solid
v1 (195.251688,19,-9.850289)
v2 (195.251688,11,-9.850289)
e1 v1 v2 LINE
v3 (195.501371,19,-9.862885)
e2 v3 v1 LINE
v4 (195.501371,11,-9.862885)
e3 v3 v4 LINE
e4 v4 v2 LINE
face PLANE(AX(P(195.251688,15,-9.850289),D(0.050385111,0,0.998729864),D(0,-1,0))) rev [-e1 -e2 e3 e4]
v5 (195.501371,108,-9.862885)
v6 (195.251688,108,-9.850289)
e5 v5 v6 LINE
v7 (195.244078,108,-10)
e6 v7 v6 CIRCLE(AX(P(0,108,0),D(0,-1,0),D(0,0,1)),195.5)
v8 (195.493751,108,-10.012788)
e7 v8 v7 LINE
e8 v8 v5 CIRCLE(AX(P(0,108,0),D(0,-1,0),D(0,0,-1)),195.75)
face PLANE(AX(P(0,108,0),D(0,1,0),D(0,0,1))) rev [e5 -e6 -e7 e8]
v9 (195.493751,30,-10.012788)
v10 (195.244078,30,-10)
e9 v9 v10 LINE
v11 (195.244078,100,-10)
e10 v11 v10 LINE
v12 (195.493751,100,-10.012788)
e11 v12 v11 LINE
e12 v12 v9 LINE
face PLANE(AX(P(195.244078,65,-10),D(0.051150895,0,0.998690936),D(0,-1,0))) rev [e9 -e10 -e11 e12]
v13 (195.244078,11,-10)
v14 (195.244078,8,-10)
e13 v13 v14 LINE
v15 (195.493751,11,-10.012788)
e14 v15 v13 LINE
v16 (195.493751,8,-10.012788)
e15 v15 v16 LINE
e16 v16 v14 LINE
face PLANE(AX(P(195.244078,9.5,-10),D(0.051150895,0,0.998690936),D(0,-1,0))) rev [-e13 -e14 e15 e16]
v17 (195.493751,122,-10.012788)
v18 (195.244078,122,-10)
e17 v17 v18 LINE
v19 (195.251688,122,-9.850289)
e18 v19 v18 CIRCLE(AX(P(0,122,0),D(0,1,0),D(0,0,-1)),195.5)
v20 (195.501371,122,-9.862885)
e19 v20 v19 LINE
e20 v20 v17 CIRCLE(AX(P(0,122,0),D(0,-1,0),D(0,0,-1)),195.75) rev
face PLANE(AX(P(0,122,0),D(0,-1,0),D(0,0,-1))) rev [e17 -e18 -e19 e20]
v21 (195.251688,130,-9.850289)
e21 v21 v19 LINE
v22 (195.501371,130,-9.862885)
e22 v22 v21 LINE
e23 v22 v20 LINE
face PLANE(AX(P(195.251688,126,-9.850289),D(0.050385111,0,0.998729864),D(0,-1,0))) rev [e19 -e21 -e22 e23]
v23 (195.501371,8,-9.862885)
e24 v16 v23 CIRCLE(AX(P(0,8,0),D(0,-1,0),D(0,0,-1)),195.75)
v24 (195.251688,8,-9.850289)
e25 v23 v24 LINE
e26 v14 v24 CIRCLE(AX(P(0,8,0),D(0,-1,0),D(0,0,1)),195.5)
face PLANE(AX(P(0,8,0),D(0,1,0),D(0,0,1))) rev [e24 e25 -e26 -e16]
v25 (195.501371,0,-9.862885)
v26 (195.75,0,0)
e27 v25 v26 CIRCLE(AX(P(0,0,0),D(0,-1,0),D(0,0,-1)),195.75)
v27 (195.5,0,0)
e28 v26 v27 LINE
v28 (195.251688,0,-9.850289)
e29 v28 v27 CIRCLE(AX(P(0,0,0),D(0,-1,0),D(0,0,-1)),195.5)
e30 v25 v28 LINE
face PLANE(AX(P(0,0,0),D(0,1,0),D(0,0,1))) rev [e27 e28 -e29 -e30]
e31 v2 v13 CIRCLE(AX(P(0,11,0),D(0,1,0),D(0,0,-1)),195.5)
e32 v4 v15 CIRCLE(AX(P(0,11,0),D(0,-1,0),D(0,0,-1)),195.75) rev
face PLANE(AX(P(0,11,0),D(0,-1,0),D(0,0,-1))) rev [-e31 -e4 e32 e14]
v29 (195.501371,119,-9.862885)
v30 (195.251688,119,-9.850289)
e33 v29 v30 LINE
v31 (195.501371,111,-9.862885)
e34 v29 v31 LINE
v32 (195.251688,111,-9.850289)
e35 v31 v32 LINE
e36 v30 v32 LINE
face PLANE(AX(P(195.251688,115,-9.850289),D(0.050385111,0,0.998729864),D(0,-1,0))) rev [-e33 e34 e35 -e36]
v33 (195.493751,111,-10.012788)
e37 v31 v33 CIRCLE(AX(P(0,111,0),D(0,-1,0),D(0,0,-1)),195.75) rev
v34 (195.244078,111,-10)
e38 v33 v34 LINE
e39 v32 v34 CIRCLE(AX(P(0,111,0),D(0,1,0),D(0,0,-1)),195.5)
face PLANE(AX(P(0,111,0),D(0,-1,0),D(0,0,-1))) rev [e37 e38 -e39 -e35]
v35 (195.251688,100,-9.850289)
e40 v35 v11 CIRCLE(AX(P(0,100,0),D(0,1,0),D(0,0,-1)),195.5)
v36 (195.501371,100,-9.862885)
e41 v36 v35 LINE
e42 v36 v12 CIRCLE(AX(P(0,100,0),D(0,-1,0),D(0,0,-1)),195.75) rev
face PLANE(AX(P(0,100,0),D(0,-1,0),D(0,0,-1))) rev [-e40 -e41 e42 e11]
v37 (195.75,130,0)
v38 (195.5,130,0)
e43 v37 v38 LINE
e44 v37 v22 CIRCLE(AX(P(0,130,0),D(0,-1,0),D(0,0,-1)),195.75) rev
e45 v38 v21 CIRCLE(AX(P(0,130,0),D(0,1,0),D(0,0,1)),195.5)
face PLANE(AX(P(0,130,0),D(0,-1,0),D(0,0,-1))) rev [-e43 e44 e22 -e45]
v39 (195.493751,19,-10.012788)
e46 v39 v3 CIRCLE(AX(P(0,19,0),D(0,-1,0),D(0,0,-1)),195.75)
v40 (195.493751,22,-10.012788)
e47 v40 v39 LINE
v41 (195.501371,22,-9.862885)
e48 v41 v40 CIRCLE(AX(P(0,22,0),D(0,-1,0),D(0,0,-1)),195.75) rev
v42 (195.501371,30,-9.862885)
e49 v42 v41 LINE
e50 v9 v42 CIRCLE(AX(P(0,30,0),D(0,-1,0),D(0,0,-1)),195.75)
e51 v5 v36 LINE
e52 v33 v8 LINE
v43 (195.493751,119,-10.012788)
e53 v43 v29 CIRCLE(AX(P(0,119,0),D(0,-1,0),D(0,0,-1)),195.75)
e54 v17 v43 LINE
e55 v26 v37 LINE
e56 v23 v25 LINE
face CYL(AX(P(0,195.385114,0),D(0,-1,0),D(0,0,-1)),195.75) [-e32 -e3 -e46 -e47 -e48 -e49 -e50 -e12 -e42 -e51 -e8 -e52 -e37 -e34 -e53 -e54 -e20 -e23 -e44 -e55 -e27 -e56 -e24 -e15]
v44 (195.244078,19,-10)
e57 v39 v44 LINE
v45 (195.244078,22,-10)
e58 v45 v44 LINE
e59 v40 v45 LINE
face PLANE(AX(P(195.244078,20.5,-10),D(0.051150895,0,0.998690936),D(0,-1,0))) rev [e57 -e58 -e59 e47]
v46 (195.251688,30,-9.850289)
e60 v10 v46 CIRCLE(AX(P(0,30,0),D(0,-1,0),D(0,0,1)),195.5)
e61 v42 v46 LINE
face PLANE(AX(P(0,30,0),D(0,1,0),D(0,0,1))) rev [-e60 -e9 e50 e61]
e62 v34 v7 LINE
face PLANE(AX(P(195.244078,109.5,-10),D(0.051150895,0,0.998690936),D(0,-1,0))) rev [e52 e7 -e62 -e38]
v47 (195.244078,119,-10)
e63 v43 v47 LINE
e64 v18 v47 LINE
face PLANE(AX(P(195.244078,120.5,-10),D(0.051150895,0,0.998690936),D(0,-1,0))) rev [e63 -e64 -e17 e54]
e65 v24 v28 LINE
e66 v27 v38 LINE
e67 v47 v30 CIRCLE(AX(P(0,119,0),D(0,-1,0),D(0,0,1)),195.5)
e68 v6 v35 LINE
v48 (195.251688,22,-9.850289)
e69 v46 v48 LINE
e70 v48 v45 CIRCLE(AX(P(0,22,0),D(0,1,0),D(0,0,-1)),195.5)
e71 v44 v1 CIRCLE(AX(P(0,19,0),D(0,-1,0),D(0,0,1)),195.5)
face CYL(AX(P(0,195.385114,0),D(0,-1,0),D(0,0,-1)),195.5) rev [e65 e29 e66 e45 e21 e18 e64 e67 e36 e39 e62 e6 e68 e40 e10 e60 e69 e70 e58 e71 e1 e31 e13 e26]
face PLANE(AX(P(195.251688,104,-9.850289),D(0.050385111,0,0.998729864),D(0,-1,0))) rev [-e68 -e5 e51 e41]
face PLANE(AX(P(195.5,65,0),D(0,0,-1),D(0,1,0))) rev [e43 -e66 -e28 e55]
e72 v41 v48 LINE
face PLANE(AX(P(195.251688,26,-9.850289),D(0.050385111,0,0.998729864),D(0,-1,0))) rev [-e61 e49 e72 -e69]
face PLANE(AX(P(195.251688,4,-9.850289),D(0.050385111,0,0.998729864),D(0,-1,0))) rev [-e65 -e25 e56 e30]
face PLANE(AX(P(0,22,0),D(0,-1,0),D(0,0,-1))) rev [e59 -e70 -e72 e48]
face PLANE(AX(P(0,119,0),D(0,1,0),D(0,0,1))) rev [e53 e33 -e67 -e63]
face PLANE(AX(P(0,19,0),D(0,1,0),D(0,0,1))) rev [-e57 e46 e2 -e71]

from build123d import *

# Parameters (mm, degrees)
BASE_FLANGE1_DEPTH        = 130
UNFOLD1_DEPTH             = 130
UNFOLD1_2_DEPTH           = 130
SKETCH6_W                 = 0.3
SKETCH6_H                 = 8
CUT_EXTRUDE1_DEPTH        = 235.985371885
LPATTERN1_COUNT           = 3
LPATTERN1_PITCH           = 11
LPATTERN2_COUNT           = 3
LPATTERN2_PITCH           = 100
LPATTERN2_COPY_1_SKETCH_W = 0.3
LPATTERN2_COPY_1_SKETCH_H = 8
LPATTERN2_COPY_1_DEPTH    = 235.985371885
LPATTERN2_COPY_2_SKETCH_W = 0.3
LPATTERN2_COPY_2_SKETCH_H = 8
LPATTERN2_COPY_2_DEPTH    = 235.985371885
LPATTERN2_COPY_3_SKETCH_W = 0.3
LPATTERN2_COPY_3_SKETCH_H = 8
LPATTERN2_COPY_3_DEPTH    = 235.985371885
LPATTERN2_COPY_4_SKETCH_W = 0.3
LPATTERN2_COPY_4_SKETCH_H = 8
LPATTERN2_COPY_4_DEPTH    = 235.985371885
FOLD1_DEPTH               = 130
FOLD1_2_DEPTH             = 130
FOLD1_START               = 30
FOLD1_3_DEPTH             = 70
FOLD1_START_2             = 8
FOLD1_4_DEPTH             = 3
FOLD1_START_3             = 19
FOLD1_5_DEPTH             = 3
FOLD1_START_4             = 108
FOLD1_6_DEPTH             = 3
FOLD1_START_5             = 119
FOLD1_7_DEPTH             = 3


# Read off the part's stored shape, not the designer's step: Unfold1, Fold1
# Sheet-metal steps are written as plain solids
with BuildPart() as part:
    # Sketch1 → Base-Flange1 (new body)
    with BuildSketch(Plane(origin=(0, 0, 0), x_dir=(1, 0, 0), z_dir=(0, 1, 0))):
        with BuildLine():
            ThreePointArc((195.5, 0), (195.436009031, 5.001637134), (195.244078015, 10))
            Line((195.244078015, 10), (195.493750749, 10.012787724))
            ThreePointArc((195.493750749, 10.012787724), (195.685927201, 5.008033089), (195.75, 0))
            Line((195.75, 0), (195.5, 0))
        make_face()
    extrude(amount=BASE_FLANGE1_DEPTH)

    # Unfold1 outline → Unfold1 (cut)
    with BuildSketch(Plane(origin=(0, 0, 0), x_dir=(1, 0, 0), z_dir=(0, 1, 0))):
        with BuildLine():
            Line((195.5, 0), (195.5, 9.890020218))
            ThreePointArc((195.5, 9.890020218), (195.496885011, 9.951404462), (195.493750749, 10.012787724))
            Line((195.493750749, 10.012787724), (195.244078015, 10))
            ThreePointArc((195.244078015, 10), (195.436009031, 5.001637134), (195.5, 0))
        make_face()
    extrude(amount=UNFOLD1_DEPTH, mode=Mode.SUBTRACT)

    # Unfold1 2 outline → Unfold1 2 (add)
    with BuildSketch(Plane(origin=(0, 0, 0), x_dir=(1, 0, 0), z_dir=(0, 1, 0))):
        with BuildLine():
            Line((195.75, 0), (195.75, 10.010762486))
            Line((195.75, 10.010762486), (195.5, 10.010762486))
            Line((195.5, 10.010762486), (195.5, 9.890020218))
            ThreePointArc((195.5, 9.890020218), (195.687490019, 4.946589732), (195.75, 0))
        make_face()
    extrude(amount=UNFOLD1_2_DEPTH)

    # Sketch6 → Cut-Extrude1 (cut, symmetric)
    with BuildSketch(Plane(origin=(195.75, 0, -195.75), x_dir=(0, 0, 1), z_dir=(-1, 0, 0))):
        with Locations((185.739237514, 126)):
            Rectangle(SKETCH6_W, SKETCH6_H)
    cut_extrude1 = extrude(amount=CUT_EXTRUDE1_DEPTH, both=True, mode=Mode.SUBTRACT)

    # LPattern1: Cut-Extrude1 ×3
    with Locations(*[(0, -i * LPATTERN1_PITCH, 0) for i in range(1, LPATTERN1_COUNT)]):
        add(cut_extrude1, mode=Mode.SUBTRACT)

    # LPattern2: Cut-Extrude1 ×3
    with Locations(*[(0, -i * LPATTERN2_PITCH, 0) for i in range(1, LPATTERN2_COUNT)]):
        add(cut_extrude1, mode=Mode.SUBTRACT)

    # LPattern2 copy 1 sketch → LPattern2 copy 1 (cut, symmetric)
    with BuildSketch(Plane(origin=(195.75, -111, -195.75), x_dir=(0, 0, 1), z_dir=(-1, 0, 0))):
        with Locations((185.739237514, 126)):
            Rectangle(LPATTERN2_COPY_1_SKETCH_W, LPATTERN2_COPY_1_SKETCH_H)
    extrude(amount=LPATTERN2_COPY_1_DEPTH, both=True, mode=Mode.SUBTRACT)

    # LPattern2 copy 2 sketch → LPattern2 copy 2 (cut, symmetric)
    with BuildSketch(Plane(origin=(195.75, -211, -195.75), x_dir=(0, 0, 1), z_dir=(-1, 0, 0))):
        with Locations((185.739237514, 126)):
            Rectangle(LPATTERN2_COPY_2_SKETCH_W, LPATTERN2_COPY_2_SKETCH_H)
    extrude(amount=LPATTERN2_COPY_2_DEPTH, both=True, mode=Mode.SUBTRACT)

    # LPattern2 copy 3 sketch → LPattern2 copy 3 (cut, symmetric)
    with BuildSketch(Plane(origin=(195.75, -122, -195.75), x_dir=(0, 0, 1), z_dir=(-1, 0, 0))):
        with Locations((185.739237514, 126)):
            Rectangle(LPATTERN2_COPY_3_SKETCH_W, LPATTERN2_COPY_3_SKETCH_H)
    extrude(amount=LPATTERN2_COPY_3_DEPTH, both=True, mode=Mode.SUBTRACT)

    # LPattern2 copy 4 sketch → LPattern2 copy 4 (cut, symmetric)
    with BuildSketch(Plane(origin=(195.75, -222, -195.75), x_dir=(0, 0, 1), z_dir=(-1, 0, 0))):
        with Locations((185.739237514, 126)):
            Rectangle(LPATTERN2_COPY_4_SKETCH_W, LPATTERN2_COPY_4_SKETCH_H)
    extrude(amount=LPATTERN2_COPY_4_DEPTH, both=True, mode=Mode.SUBTRACT)

    # Fold1 outline → Fold1 (cut)
    with BuildSketch(Plane(origin=(0, 0, 0), x_dir=(1, 0, 0), z_dir=(0, 1, 0))):
        with BuildLine():
            ThreePointArc((195.5, 9.890020218), (195.687490019, 4.946589732), (195.75, 0))
            Line((195.75, 0), (195.75, 10.010762486))
            Line((195.75, 10.010762486), (195.5, 10.010762486))
            Line((195.5, 10.010762486), (195.5, 9.890020218))
        make_face()
    extrude(amount=FOLD1_DEPTH, mode=Mode.SUBTRACT)

    # Fold1 2 outline → Fold1 2 (add)
    with BuildSketch(Plane(origin=(0, 0, 0), x_dir=(1, 0, 0), z_dir=(0, 1, 0))):
        with BuildLine():
            ThreePointArc((195.25168835, 9.850289156), (195.437912228, 4.926709225), (195.5, 0))
            Line((195.5, 0), (195.5, 9.860762486))
            Line((195.5, 9.860762486), (195.501477905, 9.860762486))
            ThreePointArc((195.501477905, 9.860762486), (195.501424363, 9.86182396), (195.501370816, 9.862885433))
            Line((195.501370816, 9.862885433), (195.25168835, 9.850289156))
        make_face()
    extrude(amount=FOLD1_2_DEPTH)

    # Fold1 3 outline → Fold1 3 (add)
    with BuildSketch(Plane(origin=(0, 0, 0), x_dir=(1, 0, 0), z_dir=(0, 1, 0)).offset(FOLD1_START)):
        with BuildLine():
            ThreePointArc((195.244078015, 10), (195.247897532, 9.925145307), (195.25168835, 9.850289156))
            Line((195.25168835, 9.850289156), (195.5, 9.862816276))
            Line((195.5, 9.862816276), (195.5, 9.890020218))
            ThreePointArc((195.5, 9.890020218), (195.496885011, 9.951404462), (195.493750749, 10.012787724))
            Line((195.493750749, 10.012787724), (195.244078015, 10))
        make_face()
    extrude(amount=FOLD1_3_DEPTH)

    # Fold1 4 outline → Fold1 4 (add)
    with BuildSketch(Plane(origin=(0, 0, 0), x_dir=(1, 0, 0), z_dir=(0, 1, 0)).offset(FOLD1_START_2)):
        with BuildLine():
            ThreePointArc((195.244078015, 10), (195.247897532, 9.925145307), (195.25168835, 9.850289156))
            Line((195.25168835, 9.850289156), (195.5, 9.862816276))
            Line((195.5, 9.862816276), (195.5, 9.890020218))
            ThreePointArc((195.5, 9.890020218), (195.496885011, 9.951404462), (195.493750749, 10.012787724))
            Line((195.493750749, 10.012787724), (195.244078015, 10))
        make_face()
    extrude(amount=FOLD1_4_DEPTH)

    # Fold1 5 outline → Fold1 5 (add)
    with BuildSketch(Plane(origin=(0, 0, 0), x_dir=(1, 0, 0), z_dir=(0, 1, 0)).offset(FOLD1_START_3)):
        with BuildLine():
            ThreePointArc((195.244078015, 10), (195.247897532, 9.925145307), (195.25168835, 9.850289156))
            Line((195.25168835, 9.850289156), (195.5, 9.862816276))
            Line((195.5, 9.862816276), (195.5, 9.890020218))
            ThreePointArc((195.5, 9.890020218), (195.496885011, 9.951404462), (195.493750749, 10.012787724))
            Line((195.493750749, 10.012787724), (195.244078015, 10))
        make_face()
    extrude(amount=FOLD1_5_DEPTH)

    # Fold1 6 outline → Fold1 6 (add)
    with BuildSketch(Plane(origin=(0, 0, 0), x_dir=(1, 0, 0), z_dir=(0, 1, 0)).offset(FOLD1_START_4)):
        with BuildLine():
            ThreePointArc((195.244078015, 10), (195.247897532, 9.925145307), (195.25168835, 9.850289156))
            Line((195.25168835, 9.850289156), (195.5, 9.862816276))
            Line((195.5, 9.862816276), (195.5, 9.890020218))
            ThreePointArc((195.5, 9.890020218), (195.496885011, 9.951404462), (195.493750749, 10.012787724))
            Line((195.493750749, 10.012787724), (195.244078015, 10))
        make_face()
    extrude(amount=FOLD1_6_DEPTH)

    # Fold1 7 outline → Fold1 7 (add)
    with BuildSketch(Plane(origin=(0, 0, 0), x_dir=(1, 0, 0), z_dir=(0, 1, 0)).offset(FOLD1_START_5)):
        with BuildLine():
            ThreePointArc((195.244078015, 10), (195.247897532, 9.925145307), (195.25168835, 9.850289156))
            Line((195.25168835, 9.850289156), (195.5, 9.862816276))
            Line((195.5, 9.862816276), (195.5, 9.890020218))
            ThreePointArc((195.5, 9.890020218), (195.496885011, 9.951404462), (195.493750749, 10.012787724))
            Line((195.493750749, 10.012787724), (195.244078015, 10))
        make_face()
    extrude(amount=FOLD1_7_DEPTH)


solid = part.part
